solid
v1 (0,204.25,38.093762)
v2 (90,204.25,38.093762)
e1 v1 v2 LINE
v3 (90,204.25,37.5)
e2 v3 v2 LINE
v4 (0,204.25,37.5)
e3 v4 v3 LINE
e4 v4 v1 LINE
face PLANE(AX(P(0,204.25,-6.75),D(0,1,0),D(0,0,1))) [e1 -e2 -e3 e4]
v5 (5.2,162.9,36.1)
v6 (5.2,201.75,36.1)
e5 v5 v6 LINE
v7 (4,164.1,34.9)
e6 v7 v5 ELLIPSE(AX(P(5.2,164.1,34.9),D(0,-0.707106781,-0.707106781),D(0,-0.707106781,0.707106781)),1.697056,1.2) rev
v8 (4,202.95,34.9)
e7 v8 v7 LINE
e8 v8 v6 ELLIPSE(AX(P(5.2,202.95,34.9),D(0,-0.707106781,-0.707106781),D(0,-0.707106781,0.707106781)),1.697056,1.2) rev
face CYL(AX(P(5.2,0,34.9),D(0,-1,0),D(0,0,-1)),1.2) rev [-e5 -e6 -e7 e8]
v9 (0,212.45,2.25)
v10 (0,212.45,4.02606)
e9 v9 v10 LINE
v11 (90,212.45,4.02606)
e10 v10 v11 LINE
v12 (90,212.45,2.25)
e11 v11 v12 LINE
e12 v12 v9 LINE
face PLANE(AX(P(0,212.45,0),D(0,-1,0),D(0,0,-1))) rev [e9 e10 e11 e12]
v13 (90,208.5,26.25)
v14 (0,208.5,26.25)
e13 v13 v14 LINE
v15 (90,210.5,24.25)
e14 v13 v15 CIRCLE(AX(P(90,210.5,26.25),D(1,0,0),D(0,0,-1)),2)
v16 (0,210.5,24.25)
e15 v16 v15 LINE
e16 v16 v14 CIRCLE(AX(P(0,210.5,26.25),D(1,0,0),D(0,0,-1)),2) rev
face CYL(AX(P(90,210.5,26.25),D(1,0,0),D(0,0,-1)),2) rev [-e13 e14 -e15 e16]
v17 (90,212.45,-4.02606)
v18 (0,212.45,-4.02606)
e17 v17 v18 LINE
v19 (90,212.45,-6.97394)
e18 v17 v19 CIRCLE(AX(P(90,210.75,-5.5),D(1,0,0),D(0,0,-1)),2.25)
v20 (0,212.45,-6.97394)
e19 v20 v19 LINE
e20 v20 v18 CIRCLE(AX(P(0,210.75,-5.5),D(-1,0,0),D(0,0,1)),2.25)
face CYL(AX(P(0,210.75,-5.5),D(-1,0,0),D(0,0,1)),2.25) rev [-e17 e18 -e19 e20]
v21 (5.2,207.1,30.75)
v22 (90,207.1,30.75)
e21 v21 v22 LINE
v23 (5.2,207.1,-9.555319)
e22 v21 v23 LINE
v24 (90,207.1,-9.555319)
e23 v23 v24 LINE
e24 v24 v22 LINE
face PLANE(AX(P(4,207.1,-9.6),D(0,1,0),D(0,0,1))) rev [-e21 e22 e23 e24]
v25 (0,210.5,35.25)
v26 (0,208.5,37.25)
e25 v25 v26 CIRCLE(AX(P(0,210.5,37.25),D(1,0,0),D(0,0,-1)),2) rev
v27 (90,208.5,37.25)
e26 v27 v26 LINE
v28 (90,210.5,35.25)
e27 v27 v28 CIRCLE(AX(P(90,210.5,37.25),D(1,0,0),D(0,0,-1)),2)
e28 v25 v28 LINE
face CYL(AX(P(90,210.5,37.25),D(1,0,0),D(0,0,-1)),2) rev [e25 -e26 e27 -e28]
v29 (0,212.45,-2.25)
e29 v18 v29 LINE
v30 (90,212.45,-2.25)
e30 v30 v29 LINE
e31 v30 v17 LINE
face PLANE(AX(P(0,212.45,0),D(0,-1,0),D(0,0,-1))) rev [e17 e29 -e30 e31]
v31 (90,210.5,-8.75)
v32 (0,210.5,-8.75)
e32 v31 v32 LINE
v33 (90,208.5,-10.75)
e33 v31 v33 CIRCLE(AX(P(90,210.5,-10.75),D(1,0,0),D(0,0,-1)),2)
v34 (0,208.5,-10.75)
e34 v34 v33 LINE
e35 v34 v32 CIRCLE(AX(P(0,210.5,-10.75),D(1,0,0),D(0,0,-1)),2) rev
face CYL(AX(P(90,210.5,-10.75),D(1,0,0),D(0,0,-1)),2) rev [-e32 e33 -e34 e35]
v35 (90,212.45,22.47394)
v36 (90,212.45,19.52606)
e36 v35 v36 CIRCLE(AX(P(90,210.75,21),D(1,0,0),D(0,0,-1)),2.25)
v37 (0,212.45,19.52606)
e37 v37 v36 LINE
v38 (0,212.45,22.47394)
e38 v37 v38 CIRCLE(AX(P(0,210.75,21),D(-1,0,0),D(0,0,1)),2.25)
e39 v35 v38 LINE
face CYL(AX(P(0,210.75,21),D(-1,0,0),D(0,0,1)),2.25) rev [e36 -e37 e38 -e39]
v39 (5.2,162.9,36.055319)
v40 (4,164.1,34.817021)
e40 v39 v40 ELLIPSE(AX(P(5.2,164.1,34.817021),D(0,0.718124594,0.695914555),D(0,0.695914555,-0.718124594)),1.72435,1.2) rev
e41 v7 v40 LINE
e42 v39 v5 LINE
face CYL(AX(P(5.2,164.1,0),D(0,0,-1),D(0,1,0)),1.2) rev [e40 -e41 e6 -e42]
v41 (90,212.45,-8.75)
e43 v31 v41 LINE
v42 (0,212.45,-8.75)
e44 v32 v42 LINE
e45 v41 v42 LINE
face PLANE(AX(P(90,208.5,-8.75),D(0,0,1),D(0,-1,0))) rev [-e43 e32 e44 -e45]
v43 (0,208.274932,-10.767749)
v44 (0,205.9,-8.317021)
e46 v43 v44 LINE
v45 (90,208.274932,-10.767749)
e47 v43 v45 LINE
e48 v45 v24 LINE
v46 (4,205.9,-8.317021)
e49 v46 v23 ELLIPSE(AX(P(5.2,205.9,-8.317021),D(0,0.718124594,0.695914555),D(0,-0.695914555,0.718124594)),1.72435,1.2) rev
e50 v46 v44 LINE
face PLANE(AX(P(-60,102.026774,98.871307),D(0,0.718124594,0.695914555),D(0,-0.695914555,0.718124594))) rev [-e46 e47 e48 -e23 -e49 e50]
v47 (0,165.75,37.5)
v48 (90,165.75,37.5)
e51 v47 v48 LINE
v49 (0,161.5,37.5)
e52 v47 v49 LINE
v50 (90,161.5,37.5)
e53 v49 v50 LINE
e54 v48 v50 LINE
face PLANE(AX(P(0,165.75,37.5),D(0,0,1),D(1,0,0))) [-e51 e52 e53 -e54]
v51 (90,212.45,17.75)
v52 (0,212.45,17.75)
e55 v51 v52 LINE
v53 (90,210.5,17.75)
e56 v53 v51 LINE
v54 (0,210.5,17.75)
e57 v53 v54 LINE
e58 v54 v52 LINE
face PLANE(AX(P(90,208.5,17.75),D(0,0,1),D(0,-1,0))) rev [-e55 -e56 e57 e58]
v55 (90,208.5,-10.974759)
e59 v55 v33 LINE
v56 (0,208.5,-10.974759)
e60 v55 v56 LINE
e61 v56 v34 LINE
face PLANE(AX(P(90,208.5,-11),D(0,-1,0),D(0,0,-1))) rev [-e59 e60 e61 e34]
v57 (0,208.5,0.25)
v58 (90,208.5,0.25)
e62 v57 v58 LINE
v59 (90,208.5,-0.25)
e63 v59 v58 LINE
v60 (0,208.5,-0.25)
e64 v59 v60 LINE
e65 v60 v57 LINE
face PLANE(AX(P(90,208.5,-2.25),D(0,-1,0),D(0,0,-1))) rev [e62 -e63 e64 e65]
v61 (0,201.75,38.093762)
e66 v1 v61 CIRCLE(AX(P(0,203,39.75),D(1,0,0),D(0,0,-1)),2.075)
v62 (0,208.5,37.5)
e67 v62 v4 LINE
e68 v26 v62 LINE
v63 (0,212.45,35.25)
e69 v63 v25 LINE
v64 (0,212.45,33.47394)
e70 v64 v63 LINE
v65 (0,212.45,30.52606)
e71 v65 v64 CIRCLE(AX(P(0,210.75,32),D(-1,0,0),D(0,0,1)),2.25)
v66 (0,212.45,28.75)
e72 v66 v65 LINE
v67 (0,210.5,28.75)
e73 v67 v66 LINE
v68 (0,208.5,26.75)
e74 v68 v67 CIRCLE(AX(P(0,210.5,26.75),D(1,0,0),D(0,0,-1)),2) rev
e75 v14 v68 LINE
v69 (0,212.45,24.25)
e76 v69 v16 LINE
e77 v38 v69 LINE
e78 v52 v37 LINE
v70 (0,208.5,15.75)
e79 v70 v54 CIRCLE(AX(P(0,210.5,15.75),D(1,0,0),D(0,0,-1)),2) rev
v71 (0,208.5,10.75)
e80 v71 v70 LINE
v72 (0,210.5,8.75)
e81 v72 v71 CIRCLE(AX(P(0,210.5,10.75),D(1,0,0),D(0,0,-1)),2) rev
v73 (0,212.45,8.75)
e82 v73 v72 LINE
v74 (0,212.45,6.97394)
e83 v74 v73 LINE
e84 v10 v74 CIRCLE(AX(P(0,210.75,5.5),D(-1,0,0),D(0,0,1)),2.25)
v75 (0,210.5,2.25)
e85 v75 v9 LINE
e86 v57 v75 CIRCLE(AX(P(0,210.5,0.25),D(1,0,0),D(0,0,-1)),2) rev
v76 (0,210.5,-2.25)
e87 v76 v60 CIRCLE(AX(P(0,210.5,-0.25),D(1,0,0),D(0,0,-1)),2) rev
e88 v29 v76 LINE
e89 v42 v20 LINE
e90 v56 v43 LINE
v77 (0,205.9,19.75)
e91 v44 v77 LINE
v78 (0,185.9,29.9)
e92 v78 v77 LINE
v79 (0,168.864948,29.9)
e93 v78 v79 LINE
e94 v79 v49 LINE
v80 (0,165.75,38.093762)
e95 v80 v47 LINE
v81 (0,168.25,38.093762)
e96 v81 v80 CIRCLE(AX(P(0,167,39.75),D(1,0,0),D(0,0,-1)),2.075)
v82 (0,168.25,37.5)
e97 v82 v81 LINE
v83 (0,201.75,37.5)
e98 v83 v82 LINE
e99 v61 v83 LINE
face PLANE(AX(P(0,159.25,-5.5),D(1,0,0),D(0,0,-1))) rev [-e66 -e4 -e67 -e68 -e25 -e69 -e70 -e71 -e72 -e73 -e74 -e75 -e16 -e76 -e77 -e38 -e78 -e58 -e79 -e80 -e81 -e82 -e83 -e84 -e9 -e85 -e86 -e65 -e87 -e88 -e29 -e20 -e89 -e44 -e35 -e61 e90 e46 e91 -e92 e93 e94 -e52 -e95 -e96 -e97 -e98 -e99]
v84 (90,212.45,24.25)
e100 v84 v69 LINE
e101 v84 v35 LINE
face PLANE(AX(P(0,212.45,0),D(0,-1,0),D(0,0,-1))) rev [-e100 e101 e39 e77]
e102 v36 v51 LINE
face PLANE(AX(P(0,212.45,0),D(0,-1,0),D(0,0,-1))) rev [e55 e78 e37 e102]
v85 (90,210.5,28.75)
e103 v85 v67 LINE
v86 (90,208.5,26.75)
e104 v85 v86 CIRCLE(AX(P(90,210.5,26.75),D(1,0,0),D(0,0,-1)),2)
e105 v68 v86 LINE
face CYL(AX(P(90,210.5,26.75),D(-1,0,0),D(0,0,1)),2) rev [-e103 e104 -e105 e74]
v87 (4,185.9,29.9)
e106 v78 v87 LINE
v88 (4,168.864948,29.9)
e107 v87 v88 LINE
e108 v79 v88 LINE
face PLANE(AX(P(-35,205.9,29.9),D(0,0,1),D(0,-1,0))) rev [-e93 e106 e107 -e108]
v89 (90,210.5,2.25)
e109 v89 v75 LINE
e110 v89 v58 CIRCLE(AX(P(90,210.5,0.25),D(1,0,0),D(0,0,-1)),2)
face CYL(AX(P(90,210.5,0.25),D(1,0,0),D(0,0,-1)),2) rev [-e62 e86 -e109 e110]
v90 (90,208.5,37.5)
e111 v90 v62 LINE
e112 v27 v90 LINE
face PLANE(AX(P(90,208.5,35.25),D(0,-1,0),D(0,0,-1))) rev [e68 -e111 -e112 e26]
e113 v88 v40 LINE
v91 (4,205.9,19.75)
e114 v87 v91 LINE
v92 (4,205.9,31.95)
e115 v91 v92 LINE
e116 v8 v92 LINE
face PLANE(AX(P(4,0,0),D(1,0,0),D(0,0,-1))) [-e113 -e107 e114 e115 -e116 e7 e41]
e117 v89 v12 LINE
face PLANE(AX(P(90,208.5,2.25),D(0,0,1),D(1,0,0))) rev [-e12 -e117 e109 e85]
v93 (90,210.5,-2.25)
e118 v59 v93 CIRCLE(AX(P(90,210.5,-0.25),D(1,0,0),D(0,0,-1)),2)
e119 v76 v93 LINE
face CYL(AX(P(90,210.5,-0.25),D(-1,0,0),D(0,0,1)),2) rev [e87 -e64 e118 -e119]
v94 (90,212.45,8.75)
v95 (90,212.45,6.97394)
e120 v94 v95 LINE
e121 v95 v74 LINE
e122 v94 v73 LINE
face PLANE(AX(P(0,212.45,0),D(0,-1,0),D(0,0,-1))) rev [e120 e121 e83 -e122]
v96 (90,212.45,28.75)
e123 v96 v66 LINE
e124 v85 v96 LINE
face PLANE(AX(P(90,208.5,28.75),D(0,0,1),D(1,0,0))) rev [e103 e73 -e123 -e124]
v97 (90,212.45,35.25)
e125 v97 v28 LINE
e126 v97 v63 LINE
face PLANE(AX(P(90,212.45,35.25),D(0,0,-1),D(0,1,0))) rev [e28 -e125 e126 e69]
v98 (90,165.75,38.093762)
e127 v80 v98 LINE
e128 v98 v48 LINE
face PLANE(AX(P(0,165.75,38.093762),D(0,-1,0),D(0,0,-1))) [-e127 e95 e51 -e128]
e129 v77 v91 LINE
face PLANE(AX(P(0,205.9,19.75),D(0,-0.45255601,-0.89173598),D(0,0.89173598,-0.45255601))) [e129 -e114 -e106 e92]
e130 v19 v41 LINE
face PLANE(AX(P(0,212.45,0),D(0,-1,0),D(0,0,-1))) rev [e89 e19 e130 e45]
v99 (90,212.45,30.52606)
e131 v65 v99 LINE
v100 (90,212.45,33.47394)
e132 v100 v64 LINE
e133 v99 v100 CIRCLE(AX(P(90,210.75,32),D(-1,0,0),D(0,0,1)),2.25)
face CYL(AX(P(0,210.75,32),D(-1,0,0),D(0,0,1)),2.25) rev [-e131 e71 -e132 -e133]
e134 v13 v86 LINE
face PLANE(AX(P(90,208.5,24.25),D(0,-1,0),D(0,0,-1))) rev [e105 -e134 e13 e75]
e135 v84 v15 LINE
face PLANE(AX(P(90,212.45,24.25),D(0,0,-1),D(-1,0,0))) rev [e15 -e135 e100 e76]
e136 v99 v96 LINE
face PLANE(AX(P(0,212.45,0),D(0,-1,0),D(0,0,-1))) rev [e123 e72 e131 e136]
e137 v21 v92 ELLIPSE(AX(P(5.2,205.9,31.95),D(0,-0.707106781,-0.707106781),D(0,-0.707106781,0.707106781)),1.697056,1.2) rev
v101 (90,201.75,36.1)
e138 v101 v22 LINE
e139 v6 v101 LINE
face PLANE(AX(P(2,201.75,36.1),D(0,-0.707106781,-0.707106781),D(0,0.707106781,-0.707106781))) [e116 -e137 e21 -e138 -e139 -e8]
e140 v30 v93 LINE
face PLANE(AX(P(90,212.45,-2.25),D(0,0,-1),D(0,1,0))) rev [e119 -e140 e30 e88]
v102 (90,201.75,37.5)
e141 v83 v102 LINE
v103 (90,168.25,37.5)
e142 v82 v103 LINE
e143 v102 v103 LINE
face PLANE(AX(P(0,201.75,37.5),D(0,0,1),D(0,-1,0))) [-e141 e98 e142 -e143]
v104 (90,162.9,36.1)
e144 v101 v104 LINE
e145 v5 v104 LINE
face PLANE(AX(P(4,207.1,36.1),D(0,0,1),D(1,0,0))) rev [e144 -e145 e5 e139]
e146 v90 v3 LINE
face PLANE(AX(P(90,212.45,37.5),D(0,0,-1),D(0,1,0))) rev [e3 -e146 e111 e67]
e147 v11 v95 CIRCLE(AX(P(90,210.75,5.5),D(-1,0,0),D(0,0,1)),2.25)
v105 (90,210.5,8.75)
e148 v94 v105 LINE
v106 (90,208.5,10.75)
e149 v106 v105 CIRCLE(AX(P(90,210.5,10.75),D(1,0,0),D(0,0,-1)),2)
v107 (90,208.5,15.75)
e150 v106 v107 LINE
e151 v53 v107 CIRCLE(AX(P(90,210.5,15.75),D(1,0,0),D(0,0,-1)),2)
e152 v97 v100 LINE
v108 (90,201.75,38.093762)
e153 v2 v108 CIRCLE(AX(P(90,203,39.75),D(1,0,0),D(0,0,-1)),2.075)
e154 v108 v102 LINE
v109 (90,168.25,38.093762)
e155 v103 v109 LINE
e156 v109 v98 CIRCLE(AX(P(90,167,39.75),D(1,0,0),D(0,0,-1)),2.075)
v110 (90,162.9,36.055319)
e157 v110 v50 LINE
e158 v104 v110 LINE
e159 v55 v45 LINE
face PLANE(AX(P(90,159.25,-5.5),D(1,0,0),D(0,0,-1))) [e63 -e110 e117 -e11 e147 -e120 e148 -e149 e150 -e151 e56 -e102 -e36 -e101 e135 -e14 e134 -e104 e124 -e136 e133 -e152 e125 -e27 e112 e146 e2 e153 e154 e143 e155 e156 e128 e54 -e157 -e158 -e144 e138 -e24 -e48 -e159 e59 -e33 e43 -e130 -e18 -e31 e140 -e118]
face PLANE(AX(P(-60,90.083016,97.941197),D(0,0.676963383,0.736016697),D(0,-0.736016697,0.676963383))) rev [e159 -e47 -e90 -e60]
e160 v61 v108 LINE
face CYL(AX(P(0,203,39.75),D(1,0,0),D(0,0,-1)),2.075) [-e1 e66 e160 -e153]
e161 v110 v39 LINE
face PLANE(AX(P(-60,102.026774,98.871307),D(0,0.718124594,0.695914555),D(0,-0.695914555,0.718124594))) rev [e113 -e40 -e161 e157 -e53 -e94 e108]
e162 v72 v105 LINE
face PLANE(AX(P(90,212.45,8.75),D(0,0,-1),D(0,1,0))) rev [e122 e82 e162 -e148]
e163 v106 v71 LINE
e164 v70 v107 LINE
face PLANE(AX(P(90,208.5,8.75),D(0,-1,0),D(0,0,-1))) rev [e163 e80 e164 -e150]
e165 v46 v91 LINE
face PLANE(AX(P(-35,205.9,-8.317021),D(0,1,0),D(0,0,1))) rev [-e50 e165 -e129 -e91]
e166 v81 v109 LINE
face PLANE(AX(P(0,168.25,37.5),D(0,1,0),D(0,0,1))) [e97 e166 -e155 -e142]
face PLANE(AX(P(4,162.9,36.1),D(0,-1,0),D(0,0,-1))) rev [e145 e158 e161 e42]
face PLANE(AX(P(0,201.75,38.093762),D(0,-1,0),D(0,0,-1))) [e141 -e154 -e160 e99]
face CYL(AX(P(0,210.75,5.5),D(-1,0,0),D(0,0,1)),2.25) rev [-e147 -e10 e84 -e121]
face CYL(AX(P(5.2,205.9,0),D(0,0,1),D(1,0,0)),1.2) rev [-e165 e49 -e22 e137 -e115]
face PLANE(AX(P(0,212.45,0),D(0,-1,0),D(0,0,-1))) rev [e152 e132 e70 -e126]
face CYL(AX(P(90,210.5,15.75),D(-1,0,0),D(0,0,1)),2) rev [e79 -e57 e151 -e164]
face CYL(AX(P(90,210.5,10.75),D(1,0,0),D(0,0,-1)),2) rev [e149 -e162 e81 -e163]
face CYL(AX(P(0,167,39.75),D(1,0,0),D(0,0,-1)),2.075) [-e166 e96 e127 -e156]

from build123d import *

# Parameters (mm, degrees)
EXTRUDE_1_DEPTH             = 90
SKETCH_2_W                  = 90
SKETCH_2_H                  = 42.75
EXTRUDE_2_DEPTH             = 8.2
SKETCH_3_W                  = 90
SKETCH_3_H                  = 52.45
EXTRUDE_3_DEPTH             = 8.2
SKETCH_4_W                  = 3.95
SKETCH_4_H                  = 2.25
CUT_EXTRUDE_1_DEPTH         = 235.487383722
SKETCH_5_W                  = 3.95
SKETCH_5_H                  = 29.5
CUT_EXTRUDE_2_DEPTH         = 235.487383722
SKETCH_6_W                  = 3.95
SKETCH_6_H                  = 6.2
CUT_EXTRUDE_3_DEPTH         = 235.487383722
SKETCH_7_W                  = 2.25
SKETCH_7_H                  = 3.95
CUT_EXTRUDE_4_DEPTH         = 235.487383722
SKETCH_8_W                  = 4.5
SKETCH_8_H                  = 3.95
CUT_EXTRUDE_5_DEPTH         = 235.487383722
SKETCH_9_W                  = 9
SKETCH_9_H                  = 3.95
CUT_EXTRUDE_6_DEPTH         = 235.487383722
SKETCH_10_W                 = 4.5
SKETCH_10_H                 = 3.95
CUT_EXTRUDE_7_DEPTH         = 235.487383722
SKETCH_11_W                 = 2.25
SKETCH_11_H                 = 3.95
CUT_EXTRUDE_8_DEPTH         = 235.487383722
SKETCH_12_W                 = 45.7
SKETCH_12_H                 = 44.2
CUT_EXTRUDE_9_DEPTH         = 86
HOLE_WIZARD_2_5_2_5_1_D     = 2.5
HOLE_WIZARD_4_5_4_5_1_D     = 4.5
HOLE_WIZARD_8_3_8_3_1_D     = 8.3
HOLE_WIZARD_8_3_8_3_1_DEPTH = 3.2
SKETCH_19_R                 = 1.67252853
SKETCH_19_R_2               = 1.459159852
SKETCH_19_R_3               = 1.459908976
SKETCH_19_R_4               = 1.592821911
SKETCH_19_R_5               = 1.532216665
SKETCH_19_R_6               = 1.596138091
EXTRUDE_4_DEPTH             = 90
CUT_EXTRUDE_START           = -90
SKETCH_20_R                 = 4.15
CUT_EXTRUDE_10_DEPTH        = 90
FILLET_1_R                  = 2
FILLET_2_R                  = 2
FILLET_3_R                  = 2
FILLET_4_R                  = 2
FILLET_5_R                  = 2
FILLET_6_R                  = 2
FILLET_7_R                  = 2
FILLET_8_R                  = 2
FILLET_9_R                  = 2
FILLET_10_R                 = 2
FILLET_11_R                 = 2
FILLET_12_R                 = 2
FILLET_13_R                 = 1.2
CUT_EXTRUDE_12_DEPTH        = 150
CUT_EXTRUDE_13_DEPTH        = 39
EXTRUDE_5_DEPTH             = 4
EXTRUDE_6_DEPTH             = 88


with BuildPart() as part:
    # Эскиз1 → Бобышка-Вытянуть1 (new body)
    with BuildSketch(Plane(origin=(90, 0, 0), x_dir=(0, 0, -1), z_dir=(1, 0, 0))):
        with BuildLine():
            Line((6.75, 160.906238208), (6.75, 204.25))
            Line((6.75, 204.25), (-38.093761792, 204.25))
            ThreePointArc((-38.093761792, 204.25), (-41.825, 203), (-38.093761792, 201.75))
            Line((-38.093761792, 201.75), (-37.5, 201.75))
            Line((-37.5, 201.75), (-37.5, 168.25))
            Line((-37.5, 168.25), (-38.093761792, 168.25))
            ThreePointArc((-38.093761792, 168.25), (-41.825, 167), (-38.093761792, 165.75))
            Line((-38.093761792, 165.75), (-37.5, 165.75))
            Line((-37.5, 165.75), (-37.5, 161.5))
            Line((-37.5, 161.5), (-33.25, 161.5))
            Line((-33.25, 161.5), (-33.25, 160.906238208))
            ThreePointArc((-33.25, 160.906238208), (-32, 157.175), (-30.75, 160.906238208))
            Line((-30.75, 160.906238208), (-30.75, 161.5))
            Line((-30.75, 161.5), (-22.25, 161.5))
            Line((-22.25, 161.5), (-22.25, 160.906238208))
            ThreePointArc((-22.25, 160.906238208), (-21, 157.175), (-19.75, 160.906238208))
            Line((-19.75, 160.906238208), (-19.75, 161.5))
            Line((-19.75, 161.5), (-6.75, 161.5))
            Line((-6.75, 161.5), (-6.75, 160.906238208))
            ThreePointArc((-6.75, 160.906238208), (-5.5, 157.175), (-4.25, 160.906238208))
            Line((-4.25, 160.906238208), (-4.25, 161.5))
            Line((-4.25, 161.5), (4.25, 161.5))
            Line((4.25, 161.5), (4.25, 160.906238208))
            ThreePointArc((4.25, 160.906238208), (5.5, 157.175), (6.75, 160.906238208))
        make_face()
    extrude(amount=-EXTRUDE_1_DEPTH)

    # Эскиз2 → Бобышка-Вытянуть2 (add)
    with BuildSketch(Plane(origin=(0, 0, -6.75), x_dir=(-1, 0, 0), z_dir=(0, 0, -1))):
        with Locations((-45, 182.875)):
            Rectangle(SKETCH_2_W, SKETCH_2_H)
    extrude(amount=EXTRUDE_2_DEPTH)

    # Эскиз3 → Бобышка-Вытянуть3 (add)
    with BuildSketch(Plane(origin=(0, 204.25, 0), x_dir=(-1, 0, 0), z_dir=(0, 1, 0))):
        with Locations((-45, 11.275)):
            Rectangle(SKETCH_3_W, SKETCH_3_H)
    extrude(amount=EXTRUDE_3_DEPTH)

    # Эскиз4 → Вырез-Вытянуть1 (cut, through all)
    with BuildSketch(Plane.ZY):
        with Locations((-12.975, 162.625)):
            Rectangle(SKETCH_4_W, SKETCH_4_H)
    extrude(amount=-CUT_EXTRUDE_1_DEPTH, mode=Mode.SUBTRACT)

    # Эскиз5 → Вырез-Вытянуть2 (cut, through all)
    with BuildSketch(Plane.ZY):
        with Locations((-12.975, 185)):
            Rectangle(SKETCH_5_W, SKETCH_5_H)
    extrude(amount=-CUT_EXTRUDE_2_DEPTH, mode=Mode.SUBTRACT)

    # Эскиз6 → Вырез-Вытянуть3 (cut, through all)
    with BuildSketch(Plane.ZY):
        with Locations((-12.975, 209.35)):
            Rectangle(SKETCH_6_W, SKETCH_6_H)
    extrude(amount=-CUT_EXTRUDE_3_DEPTH, mode=Mode.SUBTRACT)

    # Эскиз7 → Вырез-Вытянуть4 (cut, through all)
    with BuildSketch(Plane.ZY):
        with Locations((-9.875, 210.475)):
            Rectangle(SKETCH_7_W, SKETCH_7_H)
    extrude(amount=-CUT_EXTRUDE_4_DEPTH, mode=Mode.SUBTRACT)

    # Эскиз8 → Вырез-Вытянуть5 (cut, through all)
    with BuildSketch(Plane.ZY):
        with Locations((0, 210.475)):
            Rectangle(SKETCH_8_W, SKETCH_8_H)
    extrude(amount=-CUT_EXTRUDE_5_DEPTH, mode=Mode.SUBTRACT)

    # Эскиз9 → Вырез-Вытянуть6 (cut, through all)
    with BuildSketch(Plane.ZY):
        with Locations((13.25, 210.475)):
            Rectangle(SKETCH_9_W, SKETCH_9_H)
    extrude(amount=-CUT_EXTRUDE_6_DEPTH, mode=Mode.SUBTRACT)

    # Эскиз10 → Вырез-Вытянуть7 (cut, through all)
    with BuildSketch(Plane.ZY):
        with Locations((26.5, 210.475)):
            Rectangle(SKETCH_10_W, SKETCH_10_H)
    extrude(amount=-CUT_EXTRUDE_7_DEPTH, mode=Mode.SUBTRACT)

    # Эскиз11 → Вырез-Вытянуть8 (cut, through all)
    with BuildSketch(Plane.ZY):
        with Locations((36.375, 210.475)):
            Rectangle(SKETCH_11_W, SKETCH_11_H)
    extrude(amount=-CUT_EXTRUDE_8_DEPTH, mode=Mode.SUBTRACT)

    # Эскиз12 → Вырез-Вытянуть9 (cut)
    with BuildSketch(Plane(origin=(90, 0, 0), x_dir=(0, 0, -1), z_dir=(1, 0, 0))):
        with Locations((-13.25, 185)):
            Rectangle(SKETCH_12_W, SKETCH_12_H)
    extrude(amount=-CUT_EXTRUDE_9_DEPTH, mode=Mode.SUBTRACT)

    # Диаметр отверстия Ø2.5 (2.5)1 (through all)
    with Locations(Plane(origin=(90, 0, 0), x_dir=(0, 0, -1), z_dir=(1, 0, 0))):
        with Locations((5.5, 159.25), (-21, 159.25), (-5.5, 159.25), (-32, 159.25), (-39.75, 167), (-39.75, 203)):
            Hole(HOLE_WIZARD_2_5_2_5_1_D / 2)

    # Диаметр отверстия Ø4.5 (4.5)1 (through all)
    with Locations(Plane.ZY):
        with Locations((-13.25, 167), (-13.25, 203), (-5.5, 210.75), (5.5, 210.75), (21, 210.75), (32, 210.75)):
            Hole(HOLE_WIZARD_4_5_4_5_1_D / 2)

    # Диаметр отверстия Ø8.3 (8.3)1
    with Locations(Plane.ZY):
        with Locations((13.25, 185)):
            Hole(HOLE_WIZARD_8_3_8_3_1_D / 2, depth=HOLE_WIZARD_8_3_8_3_1_DEPTH)

    # Эскиз19 → Бобышка-Вытянуть4 (add)
    with BuildSketch(Plane(origin=(90, 0, 0), x_dir=(0, 0, -1), z_dir=(1, 0, 0))):
        with Locations((-39.75, 203)):
            Circle(SKETCH_19_R)
        with Locations((-39.75, 167)):
            Circle(SKETCH_19_R_2)
        with Locations((-32, 159.25)):
            Circle(SKETCH_19_R_3)
        with Locations((-21, 159.25)):
            Circle(SKETCH_19_R_4)
        with Locations((-5.5, 159.25)):
            Circle(SKETCH_19_R_5)
        with Locations((5.5, 159.25)):
            Circle(SKETCH_19_R_6)
    extrude(amount=-EXTRUDE_4_DEPTH)

    # Эскиз20 → Вырез-Вытянуть10 (cut)
    with BuildSketch(Plane.ZY.offset(CUT_EXTRUDE_START)):
        with Locations((13.25, 185)):
            Circle(SKETCH_20_R)
    extrude(amount=CUT_EXTRUDE_10_DEPTH, mode=Mode.SUBTRACT)

    # Скругление1
    fillet_1_edges = [part.edges().sort_by_distance(p)[0] for p in [
        (45, 208.5, -8.75),
    ]]
    fillet(fillet_1_edges, radius=FILLET_1_R)

    # Скругление2
    fillet_2_edges = [part.edges().sort_by_distance(p)[0] for p in [
        (45, 163.75, -11),
    ]]
    fillet(fillet_2_edges, radius=FILLET_2_R)

    # Скругление3
    fillet_3_edges = [part.edges().sort_by_distance(p)[0] for p in [
        (45, 170.25, -11),
    ]]
    fillet(fillet_3_edges, radius=FILLET_3_R)

    # Скругление4
    fillet_4_edges = [part.edges().sort_by_distance(p)[0] for p in [
        (45, 199.75, -11),
    ]]
    fillet(fillet_4_edges, radius=FILLET_4_R)

    # Скругление5
    fillet_5_edges = [part.edges().sort_by_distance(p)[0] for p in [
        (45, 206.25, -11),
    ]]
    fillet(fillet_5_edges, radius=FILLET_5_R)

    # Скругление6
    fillet_6_edges = [part.edges().sort_by_distance(p)[0] for p in [
        (45, 208.5, -2.25),
    ]]
    fillet(fillet_6_edges, radius=FILLET_6_R)

    # Скругление7
    fillet_7_edges = [part.edges().sort_by_distance(p)[0] for p in [
        (45, 208.5, 2.25),
    ]]
    fillet(fillet_7_edges, radius=FILLET_7_R)

    # Скругление8
    fillet_8_edges = [part.edges().sort_by_distance(p)[0] for p in [
        (45, 208.5, 8.75),
    ]]
    fillet(fillet_8_edges, radius=FILLET_8_R)

    # Скругление9
    fillet_9_edges = [part.edges().sort_by_distance(p)[0] for p in [
        (45, 208.5, 17.75),
    ]]
    fillet(fillet_9_edges, radius=FILLET_9_R)

    # Скругление10
    fillet_10_edges = [part.edges().sort_by_distance(p)[0] for p in [
        (45, 208.5, 24.25),
    ]]
    fillet(fillet_10_edges, radius=FILLET_10_R)

    # Скругление11
    fillet_11_edges = [part.edges().sort_by_distance(p)[0] for p in [
        (45, 208.5, 28.75),
    ]]
    fillet(fillet_11_edges, radius=FILLET_11_R)

    # Скругление12
    fillet_12_edges = [part.edges().sort_by_distance(p)[0] for p in [
        (45, 208.5, 35.25),
    ]]
    fillet(fillet_12_edges, radius=FILLET_12_R)

    # Скругление13
    fillet_13_edges = [part.edges().sort_by_distance(p)[0] for p in [
        (4, 185, -9.6),
        (4, 162.9, 13.25),
        (4, 185, 36.1),
        (4, 207.1, 13.25),
    ]]
    fillet(fillet_13_edges, radius=FILLET_13_R)

    # Эскиз21 → Вырез-Вытянуть12 (cut)
    with BuildSketch(Plane(origin=(90, 0, 0), x_dir=(0, 0, -1), z_dir=(1, 0, 0))):
        Polygon((30.296200346, 229.506902043), (10.767748913, 208.274931936), (-37.5, 161.5), (-46.097592317, 153.168312601), (30.296200346, 153.168312601), align=None)
    extrude(amount=-CUT_EXTRUDE_12_DEPTH, mode=Mode.SUBTRACT)

    # Эскиз22 → Вырез-Вытянуть13 (cut)
    with BuildSketch(Plane(origin=(4, 0, 0), x_dir=(0, 0, -1), z_dir=(1, 0, 0))):
        with BuildLine():
            Line((-29.9, 205.9), (-29.9, 168.864948454))
            Line((-29.9, 168.864948454), (-16.230217065, 182.111954597))
            ThreePointArc((-16.230217065, 182.111954597), (-16.138045403, 187.980217065), (-10.269782935, 187.888045403))
            Line((-10.269782935, 187.888045403), (8.317021277, 205.9))
            Line((8.317021277, 205.9), (-29.9, 205.9))
        make_face()
    extrude(amount=-CUT_EXTRUDE_13_DEPTH, mode=Mode.SUBTRACT)

    # Эскиз23 → Бобышка-Вытянуть5 (add)
    with BuildSketch(Plane(origin=(4, 0, 0), x_dir=(0, 0, -1), z_dir=(1, 0, 0))):
        Polygon((-29.9, 205.9), (-29.9, 185.9), (-19.75, 205.9), align=None)
    extrude(amount=-EXTRUDE_5_DEPTH)

    # Эскиз24 → Бобышка-Вытянуть6 (add)
    with BuildSketch(Plane(origin=(90, 0, 0), x_dir=(0, 0, -1), z_dir=(1, 0, 0))):
        Polygon((-36.1, 207.1), (-36.1, 201.75), (-30.75, 207.1), align=None)
    extrude(amount=-EXTRUDE_6_DEPTH)


solid = part.part
